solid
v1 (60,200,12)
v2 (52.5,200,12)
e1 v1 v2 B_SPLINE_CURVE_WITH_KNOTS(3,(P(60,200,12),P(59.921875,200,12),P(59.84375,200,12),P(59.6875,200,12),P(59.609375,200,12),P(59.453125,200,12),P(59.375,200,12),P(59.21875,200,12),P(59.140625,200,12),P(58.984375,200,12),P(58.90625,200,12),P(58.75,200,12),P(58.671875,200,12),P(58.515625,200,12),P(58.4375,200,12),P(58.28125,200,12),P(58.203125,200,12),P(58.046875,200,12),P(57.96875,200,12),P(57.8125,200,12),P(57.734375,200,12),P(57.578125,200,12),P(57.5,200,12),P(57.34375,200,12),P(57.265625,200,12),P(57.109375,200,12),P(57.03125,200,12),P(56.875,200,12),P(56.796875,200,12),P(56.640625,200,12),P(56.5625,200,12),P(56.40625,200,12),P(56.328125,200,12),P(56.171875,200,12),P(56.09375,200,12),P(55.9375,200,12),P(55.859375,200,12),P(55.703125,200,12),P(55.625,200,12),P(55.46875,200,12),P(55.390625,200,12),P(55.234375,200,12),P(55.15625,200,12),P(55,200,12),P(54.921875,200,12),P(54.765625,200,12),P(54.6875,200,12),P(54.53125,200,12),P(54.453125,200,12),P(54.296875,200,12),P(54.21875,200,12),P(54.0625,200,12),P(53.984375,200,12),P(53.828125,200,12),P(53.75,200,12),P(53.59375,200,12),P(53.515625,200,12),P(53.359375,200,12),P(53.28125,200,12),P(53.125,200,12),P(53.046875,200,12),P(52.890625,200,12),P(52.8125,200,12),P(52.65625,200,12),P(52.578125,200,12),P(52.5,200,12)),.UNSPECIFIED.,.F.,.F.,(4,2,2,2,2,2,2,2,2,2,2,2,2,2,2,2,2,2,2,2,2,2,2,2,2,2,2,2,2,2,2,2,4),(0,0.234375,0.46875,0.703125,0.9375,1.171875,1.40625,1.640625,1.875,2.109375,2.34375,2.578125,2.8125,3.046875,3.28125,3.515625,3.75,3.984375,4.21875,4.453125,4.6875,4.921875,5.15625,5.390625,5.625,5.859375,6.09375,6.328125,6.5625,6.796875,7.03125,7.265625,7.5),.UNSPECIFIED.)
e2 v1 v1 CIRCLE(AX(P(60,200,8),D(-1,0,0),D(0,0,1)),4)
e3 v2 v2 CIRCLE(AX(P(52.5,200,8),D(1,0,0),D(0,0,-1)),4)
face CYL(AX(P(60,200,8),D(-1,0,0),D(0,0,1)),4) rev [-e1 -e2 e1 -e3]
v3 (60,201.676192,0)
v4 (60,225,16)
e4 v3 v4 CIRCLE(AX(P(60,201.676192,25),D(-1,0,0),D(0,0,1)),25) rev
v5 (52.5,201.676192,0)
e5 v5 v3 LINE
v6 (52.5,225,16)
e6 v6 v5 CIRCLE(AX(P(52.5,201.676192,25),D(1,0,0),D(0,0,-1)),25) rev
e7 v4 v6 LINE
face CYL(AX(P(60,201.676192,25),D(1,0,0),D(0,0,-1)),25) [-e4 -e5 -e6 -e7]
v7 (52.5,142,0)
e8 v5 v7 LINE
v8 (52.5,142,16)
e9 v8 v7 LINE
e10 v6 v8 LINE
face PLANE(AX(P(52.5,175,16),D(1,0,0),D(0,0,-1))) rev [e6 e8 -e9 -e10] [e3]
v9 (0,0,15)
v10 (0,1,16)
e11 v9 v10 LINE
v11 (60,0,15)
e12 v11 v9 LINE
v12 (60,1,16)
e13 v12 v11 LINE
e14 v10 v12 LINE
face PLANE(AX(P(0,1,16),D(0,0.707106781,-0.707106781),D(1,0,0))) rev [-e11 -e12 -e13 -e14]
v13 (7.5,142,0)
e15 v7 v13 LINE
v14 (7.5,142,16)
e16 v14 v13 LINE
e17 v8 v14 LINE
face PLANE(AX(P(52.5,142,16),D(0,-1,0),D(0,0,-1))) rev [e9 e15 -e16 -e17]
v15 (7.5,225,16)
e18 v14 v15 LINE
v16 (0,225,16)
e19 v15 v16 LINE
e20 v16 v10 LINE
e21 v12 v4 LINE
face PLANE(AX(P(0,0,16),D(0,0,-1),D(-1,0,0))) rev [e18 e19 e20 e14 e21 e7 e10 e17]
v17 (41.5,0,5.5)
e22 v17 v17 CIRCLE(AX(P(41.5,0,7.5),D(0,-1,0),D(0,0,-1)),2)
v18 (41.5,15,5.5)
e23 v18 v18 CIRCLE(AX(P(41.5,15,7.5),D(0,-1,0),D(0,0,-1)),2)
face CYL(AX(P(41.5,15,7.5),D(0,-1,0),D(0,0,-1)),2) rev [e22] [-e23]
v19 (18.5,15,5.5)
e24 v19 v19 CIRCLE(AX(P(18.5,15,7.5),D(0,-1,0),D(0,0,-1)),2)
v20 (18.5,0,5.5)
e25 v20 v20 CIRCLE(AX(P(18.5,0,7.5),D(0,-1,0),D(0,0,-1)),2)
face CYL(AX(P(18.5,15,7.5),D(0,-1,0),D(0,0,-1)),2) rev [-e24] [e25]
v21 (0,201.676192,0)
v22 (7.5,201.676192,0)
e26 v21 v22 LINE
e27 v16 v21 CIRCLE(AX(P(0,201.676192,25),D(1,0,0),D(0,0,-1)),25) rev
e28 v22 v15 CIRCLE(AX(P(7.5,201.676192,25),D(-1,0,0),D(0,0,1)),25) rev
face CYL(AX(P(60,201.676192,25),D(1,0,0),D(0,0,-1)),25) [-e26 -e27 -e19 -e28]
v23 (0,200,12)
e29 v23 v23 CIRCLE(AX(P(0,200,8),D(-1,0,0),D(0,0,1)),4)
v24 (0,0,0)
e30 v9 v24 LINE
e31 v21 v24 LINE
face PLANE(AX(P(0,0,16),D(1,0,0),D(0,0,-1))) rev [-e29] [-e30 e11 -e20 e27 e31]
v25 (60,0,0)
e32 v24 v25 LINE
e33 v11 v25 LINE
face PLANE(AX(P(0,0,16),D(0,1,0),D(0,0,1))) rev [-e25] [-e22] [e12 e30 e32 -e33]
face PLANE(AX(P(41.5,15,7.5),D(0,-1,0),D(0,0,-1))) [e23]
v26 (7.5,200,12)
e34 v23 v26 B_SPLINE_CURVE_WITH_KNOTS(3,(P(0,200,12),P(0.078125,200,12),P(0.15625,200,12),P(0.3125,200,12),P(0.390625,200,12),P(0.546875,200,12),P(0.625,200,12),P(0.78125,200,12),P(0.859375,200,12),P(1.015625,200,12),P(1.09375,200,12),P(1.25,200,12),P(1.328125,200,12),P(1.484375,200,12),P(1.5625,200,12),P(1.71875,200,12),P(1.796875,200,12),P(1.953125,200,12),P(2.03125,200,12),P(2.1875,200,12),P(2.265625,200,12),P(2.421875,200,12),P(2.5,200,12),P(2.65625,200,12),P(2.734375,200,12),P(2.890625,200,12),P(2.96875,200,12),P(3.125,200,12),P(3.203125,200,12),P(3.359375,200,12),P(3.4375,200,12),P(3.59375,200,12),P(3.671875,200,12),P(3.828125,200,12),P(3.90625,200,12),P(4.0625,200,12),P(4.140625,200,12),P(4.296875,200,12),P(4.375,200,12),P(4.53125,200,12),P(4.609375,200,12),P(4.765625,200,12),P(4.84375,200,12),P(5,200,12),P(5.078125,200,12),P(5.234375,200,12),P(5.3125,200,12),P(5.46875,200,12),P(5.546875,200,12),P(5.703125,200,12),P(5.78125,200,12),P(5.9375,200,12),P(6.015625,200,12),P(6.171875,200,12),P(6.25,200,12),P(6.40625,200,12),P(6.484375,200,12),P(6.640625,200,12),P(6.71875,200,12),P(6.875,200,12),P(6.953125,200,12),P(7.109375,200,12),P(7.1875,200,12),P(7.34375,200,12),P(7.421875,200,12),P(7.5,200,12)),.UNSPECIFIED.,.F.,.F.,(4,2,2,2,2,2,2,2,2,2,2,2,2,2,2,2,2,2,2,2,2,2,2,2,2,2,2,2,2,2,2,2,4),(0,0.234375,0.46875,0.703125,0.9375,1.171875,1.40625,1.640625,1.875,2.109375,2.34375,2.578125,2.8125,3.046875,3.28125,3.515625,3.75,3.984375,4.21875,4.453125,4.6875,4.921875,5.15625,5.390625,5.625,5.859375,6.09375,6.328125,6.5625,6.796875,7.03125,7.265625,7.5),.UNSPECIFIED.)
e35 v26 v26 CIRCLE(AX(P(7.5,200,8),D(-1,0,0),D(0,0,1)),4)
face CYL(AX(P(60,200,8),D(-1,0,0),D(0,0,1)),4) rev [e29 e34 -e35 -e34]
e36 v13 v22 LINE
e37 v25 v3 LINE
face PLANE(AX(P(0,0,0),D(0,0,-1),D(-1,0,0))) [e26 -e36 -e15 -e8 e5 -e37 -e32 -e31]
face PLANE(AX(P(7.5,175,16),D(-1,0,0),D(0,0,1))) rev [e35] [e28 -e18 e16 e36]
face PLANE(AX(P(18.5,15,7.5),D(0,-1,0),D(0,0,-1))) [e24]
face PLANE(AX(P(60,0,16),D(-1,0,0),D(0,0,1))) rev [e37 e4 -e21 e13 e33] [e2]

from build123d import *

# Parameters (mm, degrees)
SKETCH1_W               = 60
SKETCH1_H               = 250
BOSS_EXTRUDE1_DEPTH     = 16
CHAMFER2_SIZE           = 1
SKETCH2_R               = 2
CUT_EXTRUDE1_DEPTH      = 15
SKETCH3_W               = 45
SKETCH3_H               = 50
CUT_EXTRUDE2_DEPTH      = 258.596583828
CUT_EXTRUDE3_DEPTH      = 256.953609078
CUT_EXTRUDE3_DEPTH_BACK = 256.953609078
SKETCH4_R               = 4
SKETCH5_W               = 60
SKETCH5_H               = 25
CUT_EXTRUDE4_DEPTH      = 258.596583828
ESBO_O1_W               = 45
ESBO_O1_H               = 33
CORTE_EXTRUS_O1_DEPTH   = 234.411653522
FILETE1_R               = 25


with BuildPart() as part:
    # Sketch1 → Boss-Extrude1 (new body)
    with BuildSketch(Plane.XY):
        with Locations((30, 125)):
            Rectangle(SKETCH1_W, SKETCH1_H)
    extrude(amount=BOSS_EXTRUDE1_DEPTH)

    # Chamfer2
    chamfer2_edges = [part.edges().sort_by_distance(p)[0] for p in [
        (30, 0, 16),
    ]]
    chamfer(chamfer2_edges, length=CHAMFER2_SIZE)

    # Sketch2 → Cut-Extrude1 (cut)
    with BuildSketch(Plane(origin=(0, 0, 0), x_dir=(-1, 0, 0), z_dir=(0, -1, 0))):
        with Locations(Location((-41.5, -7.5, 0), (0, 0, 90))):
            Circle(SKETCH2_R)
        with Locations(Location((-18.5, -7.5, 0), (0, 0, 90))):
            Circle(SKETCH2_R)
    extrude(amount=-CUT_EXTRUDE1_DEPTH, mode=Mode.SUBTRACT)

    # Sketch3 → Cut-Extrude2 (cut, through all)
    with BuildSketch(Plane(origin=(0, 0, 0), x_dir=(-1, 0, 0), z_dir=(0, 0, -1))):
        with Locations((-30, 200)):
            Rectangle(SKETCH3_W, SKETCH3_H)
    extrude(amount=-CUT_EXTRUDE2_DEPTH, mode=Mode.SUBTRACT)

    # Sketch4 → Cut-Extrude3 (cut, two sides: drawn at the far end of the back side and taken through both)
    with BuildSketch(Plane.ZY.offset(-52.5).offset(-CUT_EXTRUDE3_DEPTH_BACK)):
        with Locations((8, 200)):
            Circle(SKETCH4_R)
    extrude(amount=CUT_EXTRUDE3_DEPTH + CUT_EXTRUDE3_DEPTH_BACK, mode=Mode.SUBTRACT)

    # Sketch5 → Cut-Extrude4 (cut, through all)
    with BuildSketch(Plane(origin=(0, 0, 0), x_dir=(-1, 0, 0), z_dir=(0, 0, -1))):
        with Locations((-30, 237.5)):
            Rectangle(SKETCH5_W, SKETCH5_H)
    extrude(amount=-CUT_EXTRUDE4_DEPTH, mode=Mode.SUBTRACT)

    # Esboço1 → Corte-extrusão1 (cut, through all)
    with BuildSketch(Plane(origin=(0, 0, 0), x_dir=(-1, 0, 0), z_dir=(0, 0, -1))):
        with Locations((-30, 158.5)):
            Rectangle(ESBO_O1_W, ESBO_O1_H)
    extrude(amount=-CORTE_EXTRUS_O1_DEPTH, mode=Mode.SUBTRACT)

    # Filete1
    # the kernel refuses this fillet: 25 mm, written as the material it takes off along each edge
    with BuildSketch(Plane(origin=(-5.809518948, 225, 0), x_dir=(0, 0, 1), z_dir=(1, 0, 0)), Plane(origin=(-58.309518948, 225, 0), x_dir=(0, 0, 1), z_dir=(1, 0, 0))) as filete1_piece_1:
        with BuildLine():
            CenterArc((25, 23.323807579), FILETE1_R, 180, 68.899803976)
            Line((0, 23.323807579), (-0.5, 23.323807579))
            Line((-0.5, 23.323807579), (-0.5, 0))
            Line((-0.5, 0), (0, -0.5))
            ThreePointArc((0, -0.5), (8, -0.5), (15.82, -0.466476152))
            Line((15.82, -0.466476152), (16, 0))
        make_face()
    extrude(amount=124.119037897, mode=Mode.SUBTRACT)


solid = part.part
